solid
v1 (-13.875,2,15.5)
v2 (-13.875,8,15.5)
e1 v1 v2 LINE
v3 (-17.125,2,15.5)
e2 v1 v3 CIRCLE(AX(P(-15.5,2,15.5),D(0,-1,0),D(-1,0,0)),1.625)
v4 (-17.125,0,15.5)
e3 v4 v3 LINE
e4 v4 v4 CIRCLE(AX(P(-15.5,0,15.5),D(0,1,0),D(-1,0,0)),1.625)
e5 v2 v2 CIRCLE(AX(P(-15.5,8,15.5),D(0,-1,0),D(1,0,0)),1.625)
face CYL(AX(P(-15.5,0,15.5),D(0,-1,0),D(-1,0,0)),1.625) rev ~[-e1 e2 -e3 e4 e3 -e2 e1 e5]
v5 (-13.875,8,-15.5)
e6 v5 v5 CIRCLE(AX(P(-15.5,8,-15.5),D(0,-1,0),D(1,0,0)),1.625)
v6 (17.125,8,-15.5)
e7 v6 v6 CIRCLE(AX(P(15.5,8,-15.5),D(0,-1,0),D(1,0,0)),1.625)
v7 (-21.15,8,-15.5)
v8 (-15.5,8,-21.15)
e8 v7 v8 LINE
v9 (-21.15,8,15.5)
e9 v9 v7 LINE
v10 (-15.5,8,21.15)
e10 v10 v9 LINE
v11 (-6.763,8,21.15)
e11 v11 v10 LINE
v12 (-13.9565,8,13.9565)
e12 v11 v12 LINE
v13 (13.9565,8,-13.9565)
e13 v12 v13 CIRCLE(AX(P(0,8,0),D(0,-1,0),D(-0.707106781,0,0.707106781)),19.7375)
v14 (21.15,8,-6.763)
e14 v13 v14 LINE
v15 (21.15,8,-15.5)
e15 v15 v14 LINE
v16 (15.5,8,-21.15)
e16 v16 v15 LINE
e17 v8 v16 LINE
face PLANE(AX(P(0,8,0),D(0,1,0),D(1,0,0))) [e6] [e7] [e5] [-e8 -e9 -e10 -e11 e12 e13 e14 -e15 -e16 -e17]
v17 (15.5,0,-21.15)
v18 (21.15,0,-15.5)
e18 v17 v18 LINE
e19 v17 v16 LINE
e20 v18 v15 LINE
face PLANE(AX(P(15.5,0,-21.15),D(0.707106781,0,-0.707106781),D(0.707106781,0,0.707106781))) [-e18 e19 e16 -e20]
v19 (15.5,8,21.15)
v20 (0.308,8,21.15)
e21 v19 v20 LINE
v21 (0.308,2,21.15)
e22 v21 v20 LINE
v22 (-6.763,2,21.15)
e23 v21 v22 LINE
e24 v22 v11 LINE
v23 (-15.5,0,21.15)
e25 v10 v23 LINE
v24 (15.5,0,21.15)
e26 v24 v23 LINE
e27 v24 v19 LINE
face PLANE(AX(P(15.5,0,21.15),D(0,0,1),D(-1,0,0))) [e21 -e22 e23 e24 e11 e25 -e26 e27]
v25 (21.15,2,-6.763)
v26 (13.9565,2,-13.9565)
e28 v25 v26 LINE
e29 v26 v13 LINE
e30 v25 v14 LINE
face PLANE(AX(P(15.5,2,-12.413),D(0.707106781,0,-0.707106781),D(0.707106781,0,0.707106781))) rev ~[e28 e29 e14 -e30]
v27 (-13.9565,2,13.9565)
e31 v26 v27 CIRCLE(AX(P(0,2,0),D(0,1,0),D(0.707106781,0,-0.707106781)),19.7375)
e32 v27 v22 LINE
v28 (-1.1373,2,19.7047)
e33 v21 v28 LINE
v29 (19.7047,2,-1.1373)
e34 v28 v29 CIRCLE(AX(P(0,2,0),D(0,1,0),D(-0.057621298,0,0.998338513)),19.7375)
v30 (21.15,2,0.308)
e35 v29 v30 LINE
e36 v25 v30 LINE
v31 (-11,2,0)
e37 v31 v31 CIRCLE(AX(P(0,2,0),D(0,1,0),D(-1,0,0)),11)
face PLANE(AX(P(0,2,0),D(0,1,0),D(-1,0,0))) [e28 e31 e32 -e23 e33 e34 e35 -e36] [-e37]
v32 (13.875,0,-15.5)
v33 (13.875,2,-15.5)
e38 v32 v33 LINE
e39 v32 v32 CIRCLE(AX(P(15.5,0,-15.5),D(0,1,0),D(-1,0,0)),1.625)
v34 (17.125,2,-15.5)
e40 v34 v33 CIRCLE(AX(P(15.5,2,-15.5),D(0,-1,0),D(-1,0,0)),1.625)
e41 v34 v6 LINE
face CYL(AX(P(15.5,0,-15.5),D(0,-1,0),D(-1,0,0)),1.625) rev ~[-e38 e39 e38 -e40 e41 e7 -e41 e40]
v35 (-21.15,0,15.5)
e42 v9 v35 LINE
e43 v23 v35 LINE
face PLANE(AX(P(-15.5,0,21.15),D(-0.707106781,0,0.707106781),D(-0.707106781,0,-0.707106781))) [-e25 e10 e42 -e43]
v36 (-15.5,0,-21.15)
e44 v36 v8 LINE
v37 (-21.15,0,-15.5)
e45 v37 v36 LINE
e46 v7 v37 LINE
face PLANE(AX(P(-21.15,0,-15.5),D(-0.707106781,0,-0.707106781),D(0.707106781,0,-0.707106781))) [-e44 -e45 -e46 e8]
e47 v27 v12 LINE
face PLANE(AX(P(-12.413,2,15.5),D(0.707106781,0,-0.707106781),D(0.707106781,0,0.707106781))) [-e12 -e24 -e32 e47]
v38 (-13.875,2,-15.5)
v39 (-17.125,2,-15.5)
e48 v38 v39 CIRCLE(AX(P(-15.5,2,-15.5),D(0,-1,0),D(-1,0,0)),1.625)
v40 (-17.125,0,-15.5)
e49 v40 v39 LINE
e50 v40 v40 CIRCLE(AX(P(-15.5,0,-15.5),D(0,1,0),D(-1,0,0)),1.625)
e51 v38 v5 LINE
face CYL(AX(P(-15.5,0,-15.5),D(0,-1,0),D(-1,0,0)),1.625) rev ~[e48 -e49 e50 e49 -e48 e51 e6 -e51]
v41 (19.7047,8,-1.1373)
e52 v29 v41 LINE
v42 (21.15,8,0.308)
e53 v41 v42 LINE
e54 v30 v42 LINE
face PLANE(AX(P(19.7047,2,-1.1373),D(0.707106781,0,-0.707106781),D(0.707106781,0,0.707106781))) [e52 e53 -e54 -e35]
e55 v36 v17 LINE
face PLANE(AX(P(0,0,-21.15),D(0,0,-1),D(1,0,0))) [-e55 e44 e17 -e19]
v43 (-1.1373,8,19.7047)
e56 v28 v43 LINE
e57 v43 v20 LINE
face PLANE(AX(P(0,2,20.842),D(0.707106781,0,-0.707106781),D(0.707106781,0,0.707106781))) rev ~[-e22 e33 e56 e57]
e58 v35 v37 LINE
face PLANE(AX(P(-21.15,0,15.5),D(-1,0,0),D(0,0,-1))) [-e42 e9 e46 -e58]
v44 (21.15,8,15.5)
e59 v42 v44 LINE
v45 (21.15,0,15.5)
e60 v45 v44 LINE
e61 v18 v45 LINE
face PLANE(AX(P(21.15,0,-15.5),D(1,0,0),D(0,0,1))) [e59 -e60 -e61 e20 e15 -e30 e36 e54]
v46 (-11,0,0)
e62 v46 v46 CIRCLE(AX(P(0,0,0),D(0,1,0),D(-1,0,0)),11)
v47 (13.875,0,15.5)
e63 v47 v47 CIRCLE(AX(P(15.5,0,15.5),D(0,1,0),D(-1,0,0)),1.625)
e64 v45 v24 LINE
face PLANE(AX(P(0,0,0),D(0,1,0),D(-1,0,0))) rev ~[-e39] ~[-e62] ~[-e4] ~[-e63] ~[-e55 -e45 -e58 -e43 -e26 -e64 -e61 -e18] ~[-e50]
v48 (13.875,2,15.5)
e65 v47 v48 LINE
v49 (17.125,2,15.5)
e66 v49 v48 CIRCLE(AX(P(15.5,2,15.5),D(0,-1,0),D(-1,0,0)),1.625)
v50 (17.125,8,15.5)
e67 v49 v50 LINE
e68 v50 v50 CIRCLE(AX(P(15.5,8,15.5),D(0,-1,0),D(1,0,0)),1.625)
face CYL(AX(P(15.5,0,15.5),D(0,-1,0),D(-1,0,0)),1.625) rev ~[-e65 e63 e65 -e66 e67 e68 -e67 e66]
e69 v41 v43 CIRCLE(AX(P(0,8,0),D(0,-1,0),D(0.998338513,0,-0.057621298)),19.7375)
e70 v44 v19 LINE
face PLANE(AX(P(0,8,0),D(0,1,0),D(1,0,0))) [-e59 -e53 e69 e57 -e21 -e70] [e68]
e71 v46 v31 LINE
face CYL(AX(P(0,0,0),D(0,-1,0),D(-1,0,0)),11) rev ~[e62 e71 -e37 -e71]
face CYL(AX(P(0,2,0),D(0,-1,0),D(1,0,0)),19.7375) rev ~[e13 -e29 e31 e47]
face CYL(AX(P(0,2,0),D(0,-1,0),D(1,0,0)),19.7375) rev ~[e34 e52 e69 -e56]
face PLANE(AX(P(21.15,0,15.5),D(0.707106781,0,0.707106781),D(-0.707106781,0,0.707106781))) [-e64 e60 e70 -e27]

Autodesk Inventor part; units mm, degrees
ref_plane "YZ Plane" through (0, 0, 0) normal (1, 0, 0) x (0, 1, 0)
ref_plane "XZ Plane" through (0, 0, 0) normal (0, 1, 0) x (-1, 0, 0)
ref_plane "XY Plane" through (0, 0, 0) normal (0, 0, 1) x (1, 0, 0)
sketch "Sketch1" plane through (0, 0, 0) normal (0, 1, 0) x (-1, 0, 0)
  line L0 (-15.5, 21.15) -> (15.5, 21.15)
  line L1 (21.15, 15.5) -> (21.15, -15.5)
  line L2 (15.5, -21.15) -> (-15.5, -21.15)
  line L3 (-21.15, -15.5) -> (-21.15, 15.5)
  line L4 (-21.15, 21.15) -> (21.15, -21.15) construction
  line L5 (21.15, 21.15) -> (-21.15, -21.15) construction
  line L6 (-15.5, 15.5) -> (15.5, 15.5)
  line L7 (15.5, 15.5) -> (15.5, -15.5)
  line L8 (15.5, -15.5) -> (-15.5, -15.5)
  line L9 (-15.5, -15.5) -> (-15.5, 15.5)
  line L10 (-15.5, 15.5) -> (15.5, -15.5) construction
  line L11 (15.5, 15.5) -> (-15.5, -15.5) construction
  circle A0 centre (0, 0) radius 11
  circle A1 centre (15.5, 15.5) radius 1.625
  circle A2 centre (15.5, -15.5) radius 1.625
  circle A3 centre (-15.5, -15.5) radius 1.625
  circle A4 centre (-15.5, 15.5) radius 1.625
  line L12 (15.5, -15.5) -> (15.5, -21.15)
  line L13 (21.15, -15.5) -> (15.5, -21.15)
  line L14 (-15.5, -21.15) -> (-21.15, -15.5)
  line L15 (-21.15, 15.5) -> (-15.5, 21.15)
  line L16 (15.5, 21.15) -> (21.15, 15.5)
  line L17 (0, -15.5) -> (0, -21.15)
  line L18 (0, -15.5) -> (0, -18.325)
  line L19 (0, -18.325) -> (0, -21.15)
  circle A5 centre (0, 0) radius 19.7375
  dimension "d0" = 42.3
  dimension "d1" = 42.3
  dimension "d2" = 31
  dimension "d3" = 31
  dimension "d4" = 22
  dimension "d5" = 3.25
  dimension "d6" = 3.25
  dimension "d7" = 3.25
  dimension "d8" = 3.25
extrude "Extrusion1" add sketch "Sketch1" along normal blind 2 contours L0 L16 L1 L13 L12 A2 L7 A5 A1 L6 A4 L9 A3 L8 L17 L2 L14 L3 L15 | L2 L17 A5 L8 A2 L12 | A5 L8 L17 | L17 L8 A5 | L8 A5 L7 A2 | A5 L9 L6 L7 L8 | L8 A3 L9 A5 | A5 L9 | L7 A5 | L9 A4 L6 A5 | A5 L6 A1 L7 | A5 L6
sketch "Sketch2" plane through (0, 2, 0) normal (0, 1, 0) x (1, 0, 0)
  line L0 (-15.5, 21.15) -> (15.5, 21.15)
  line L1 (21.15, 15.5) -> (21.15, -15.5)
  line L2 (15.5, -21.15) -> (-15.5, -21.15)
  line L3 (-21.15, -15.5) -> (-21.15, 15.5)
  line L4 (-21.15, 21.15) -> (21.15, -21.15) construction
  line L5 (21.15, 21.15) -> (-21.15, -21.15) construction
  line L6 (-15.5, 15.5) -> (15.5, 15.5)
  line L7 (15.5, 15.5) -> (15.5, -15.5)
  line L8 (15.5, -15.5) -> (-15.5, -15.5)
  line L9 (-15.5, -15.5) -> (-15.5, 15.5)
  line L10 (-15.5, 15.5) -> (15.5, -15.5) construction
  line L11 (15.5, 15.5) -> (-15.5, -15.5) construction
  circle A0 centre (0, 0) radius 11
  circle A1 centre (15.5, 15.5) radius 1.625
  circle A2 centre (15.5, -15.5) radius 1.625
  circle A3 centre (-15.5, -15.5) radius 1.625
  circle A4 centre (-15.5, 15.5) radius 1.625
  line L12 (15.5, -15.5) -> (15.5, -21.15)
  line L13 (21.15, -15.5) -> (15.5, -21.15)
  line L14 (-15.5, -21.15) -> (-21.15, -15.5)
  line L15 (-21.15, 15.5) -> (-15.5, 21.15)
  line L16 (15.5, 21.15) -> (21.15, 15.5)
  line L17 (0, -15.5) -> (0, -21.15)
  line L18 (0, -15.5) -> (0, -18.325)
  line L19 (0, -18.325) -> (0, -21.15)
  circle A5 centre (0, 0) radius 19.7375
  circle A6 centre (0, 0) radius 11 projected
  line L20 (-15.5, -21.15) -> (15.5, -21.15) projected
  line L21 (-13.9565, -13.9565) -> (-6.763, -21.15)
  line L22 (0, 0) -> (7.7782, -7.7782) construction
  line L23 (13.9565, 13.9565) -> (21.15, 6.763)
  circle A7 centre (0, 0) radius 14.7375 construction
  line L24 (-1.1373, -19.7047) -> (0.308, -21.15)
  line L25 (19.7047, 1.1373) -> (21.15, -0.308)
  point P0 (-10.421, -10.421)
  point P1 (10.421, 10.421)
  point P2 (20.4274, 0.4146)
  point P3 (15.5, 12.2196)
  point P4 (15.5, 12.413)
  point P5 (-12.413, -15.5)
  point P6 (-12.2196, -15.5)
  point P7 (0, -20.842)
  point P8 (21.15, -0.308)
  dimension "d15" = 22
  dimension "d11" = 42.3
  dimension "d12" = 42.3
  dimension "d13" = 31
  dimension "d14" = 31
  dimension "d16" = 3.25
  dimension "d17" = 3.25
  dimension "d18" = 3.25
  dimension "d19" = 3.25
  dimension "d23" = 5
  dimension "d24" = 5
extrude "Extrusion2" add sketch "Sketch2" along normal blind 6 contours L0 L16 L1 L23 L7 A1 L6 A5 A4 L9 A3 L8 L21 L2 L14 L3 L15 | L1 L13 L12 A2 L7 A5 L25 | L23 A5 L6 A1 L7 | L8 A3 L9 A5 L21 | L2 L24 L17 A5 L8 A2 L12 | L7 A2 L8 A5 | L24 A5 L17 | A5 L9 A4 L6
properties part number "Pumphousing"
